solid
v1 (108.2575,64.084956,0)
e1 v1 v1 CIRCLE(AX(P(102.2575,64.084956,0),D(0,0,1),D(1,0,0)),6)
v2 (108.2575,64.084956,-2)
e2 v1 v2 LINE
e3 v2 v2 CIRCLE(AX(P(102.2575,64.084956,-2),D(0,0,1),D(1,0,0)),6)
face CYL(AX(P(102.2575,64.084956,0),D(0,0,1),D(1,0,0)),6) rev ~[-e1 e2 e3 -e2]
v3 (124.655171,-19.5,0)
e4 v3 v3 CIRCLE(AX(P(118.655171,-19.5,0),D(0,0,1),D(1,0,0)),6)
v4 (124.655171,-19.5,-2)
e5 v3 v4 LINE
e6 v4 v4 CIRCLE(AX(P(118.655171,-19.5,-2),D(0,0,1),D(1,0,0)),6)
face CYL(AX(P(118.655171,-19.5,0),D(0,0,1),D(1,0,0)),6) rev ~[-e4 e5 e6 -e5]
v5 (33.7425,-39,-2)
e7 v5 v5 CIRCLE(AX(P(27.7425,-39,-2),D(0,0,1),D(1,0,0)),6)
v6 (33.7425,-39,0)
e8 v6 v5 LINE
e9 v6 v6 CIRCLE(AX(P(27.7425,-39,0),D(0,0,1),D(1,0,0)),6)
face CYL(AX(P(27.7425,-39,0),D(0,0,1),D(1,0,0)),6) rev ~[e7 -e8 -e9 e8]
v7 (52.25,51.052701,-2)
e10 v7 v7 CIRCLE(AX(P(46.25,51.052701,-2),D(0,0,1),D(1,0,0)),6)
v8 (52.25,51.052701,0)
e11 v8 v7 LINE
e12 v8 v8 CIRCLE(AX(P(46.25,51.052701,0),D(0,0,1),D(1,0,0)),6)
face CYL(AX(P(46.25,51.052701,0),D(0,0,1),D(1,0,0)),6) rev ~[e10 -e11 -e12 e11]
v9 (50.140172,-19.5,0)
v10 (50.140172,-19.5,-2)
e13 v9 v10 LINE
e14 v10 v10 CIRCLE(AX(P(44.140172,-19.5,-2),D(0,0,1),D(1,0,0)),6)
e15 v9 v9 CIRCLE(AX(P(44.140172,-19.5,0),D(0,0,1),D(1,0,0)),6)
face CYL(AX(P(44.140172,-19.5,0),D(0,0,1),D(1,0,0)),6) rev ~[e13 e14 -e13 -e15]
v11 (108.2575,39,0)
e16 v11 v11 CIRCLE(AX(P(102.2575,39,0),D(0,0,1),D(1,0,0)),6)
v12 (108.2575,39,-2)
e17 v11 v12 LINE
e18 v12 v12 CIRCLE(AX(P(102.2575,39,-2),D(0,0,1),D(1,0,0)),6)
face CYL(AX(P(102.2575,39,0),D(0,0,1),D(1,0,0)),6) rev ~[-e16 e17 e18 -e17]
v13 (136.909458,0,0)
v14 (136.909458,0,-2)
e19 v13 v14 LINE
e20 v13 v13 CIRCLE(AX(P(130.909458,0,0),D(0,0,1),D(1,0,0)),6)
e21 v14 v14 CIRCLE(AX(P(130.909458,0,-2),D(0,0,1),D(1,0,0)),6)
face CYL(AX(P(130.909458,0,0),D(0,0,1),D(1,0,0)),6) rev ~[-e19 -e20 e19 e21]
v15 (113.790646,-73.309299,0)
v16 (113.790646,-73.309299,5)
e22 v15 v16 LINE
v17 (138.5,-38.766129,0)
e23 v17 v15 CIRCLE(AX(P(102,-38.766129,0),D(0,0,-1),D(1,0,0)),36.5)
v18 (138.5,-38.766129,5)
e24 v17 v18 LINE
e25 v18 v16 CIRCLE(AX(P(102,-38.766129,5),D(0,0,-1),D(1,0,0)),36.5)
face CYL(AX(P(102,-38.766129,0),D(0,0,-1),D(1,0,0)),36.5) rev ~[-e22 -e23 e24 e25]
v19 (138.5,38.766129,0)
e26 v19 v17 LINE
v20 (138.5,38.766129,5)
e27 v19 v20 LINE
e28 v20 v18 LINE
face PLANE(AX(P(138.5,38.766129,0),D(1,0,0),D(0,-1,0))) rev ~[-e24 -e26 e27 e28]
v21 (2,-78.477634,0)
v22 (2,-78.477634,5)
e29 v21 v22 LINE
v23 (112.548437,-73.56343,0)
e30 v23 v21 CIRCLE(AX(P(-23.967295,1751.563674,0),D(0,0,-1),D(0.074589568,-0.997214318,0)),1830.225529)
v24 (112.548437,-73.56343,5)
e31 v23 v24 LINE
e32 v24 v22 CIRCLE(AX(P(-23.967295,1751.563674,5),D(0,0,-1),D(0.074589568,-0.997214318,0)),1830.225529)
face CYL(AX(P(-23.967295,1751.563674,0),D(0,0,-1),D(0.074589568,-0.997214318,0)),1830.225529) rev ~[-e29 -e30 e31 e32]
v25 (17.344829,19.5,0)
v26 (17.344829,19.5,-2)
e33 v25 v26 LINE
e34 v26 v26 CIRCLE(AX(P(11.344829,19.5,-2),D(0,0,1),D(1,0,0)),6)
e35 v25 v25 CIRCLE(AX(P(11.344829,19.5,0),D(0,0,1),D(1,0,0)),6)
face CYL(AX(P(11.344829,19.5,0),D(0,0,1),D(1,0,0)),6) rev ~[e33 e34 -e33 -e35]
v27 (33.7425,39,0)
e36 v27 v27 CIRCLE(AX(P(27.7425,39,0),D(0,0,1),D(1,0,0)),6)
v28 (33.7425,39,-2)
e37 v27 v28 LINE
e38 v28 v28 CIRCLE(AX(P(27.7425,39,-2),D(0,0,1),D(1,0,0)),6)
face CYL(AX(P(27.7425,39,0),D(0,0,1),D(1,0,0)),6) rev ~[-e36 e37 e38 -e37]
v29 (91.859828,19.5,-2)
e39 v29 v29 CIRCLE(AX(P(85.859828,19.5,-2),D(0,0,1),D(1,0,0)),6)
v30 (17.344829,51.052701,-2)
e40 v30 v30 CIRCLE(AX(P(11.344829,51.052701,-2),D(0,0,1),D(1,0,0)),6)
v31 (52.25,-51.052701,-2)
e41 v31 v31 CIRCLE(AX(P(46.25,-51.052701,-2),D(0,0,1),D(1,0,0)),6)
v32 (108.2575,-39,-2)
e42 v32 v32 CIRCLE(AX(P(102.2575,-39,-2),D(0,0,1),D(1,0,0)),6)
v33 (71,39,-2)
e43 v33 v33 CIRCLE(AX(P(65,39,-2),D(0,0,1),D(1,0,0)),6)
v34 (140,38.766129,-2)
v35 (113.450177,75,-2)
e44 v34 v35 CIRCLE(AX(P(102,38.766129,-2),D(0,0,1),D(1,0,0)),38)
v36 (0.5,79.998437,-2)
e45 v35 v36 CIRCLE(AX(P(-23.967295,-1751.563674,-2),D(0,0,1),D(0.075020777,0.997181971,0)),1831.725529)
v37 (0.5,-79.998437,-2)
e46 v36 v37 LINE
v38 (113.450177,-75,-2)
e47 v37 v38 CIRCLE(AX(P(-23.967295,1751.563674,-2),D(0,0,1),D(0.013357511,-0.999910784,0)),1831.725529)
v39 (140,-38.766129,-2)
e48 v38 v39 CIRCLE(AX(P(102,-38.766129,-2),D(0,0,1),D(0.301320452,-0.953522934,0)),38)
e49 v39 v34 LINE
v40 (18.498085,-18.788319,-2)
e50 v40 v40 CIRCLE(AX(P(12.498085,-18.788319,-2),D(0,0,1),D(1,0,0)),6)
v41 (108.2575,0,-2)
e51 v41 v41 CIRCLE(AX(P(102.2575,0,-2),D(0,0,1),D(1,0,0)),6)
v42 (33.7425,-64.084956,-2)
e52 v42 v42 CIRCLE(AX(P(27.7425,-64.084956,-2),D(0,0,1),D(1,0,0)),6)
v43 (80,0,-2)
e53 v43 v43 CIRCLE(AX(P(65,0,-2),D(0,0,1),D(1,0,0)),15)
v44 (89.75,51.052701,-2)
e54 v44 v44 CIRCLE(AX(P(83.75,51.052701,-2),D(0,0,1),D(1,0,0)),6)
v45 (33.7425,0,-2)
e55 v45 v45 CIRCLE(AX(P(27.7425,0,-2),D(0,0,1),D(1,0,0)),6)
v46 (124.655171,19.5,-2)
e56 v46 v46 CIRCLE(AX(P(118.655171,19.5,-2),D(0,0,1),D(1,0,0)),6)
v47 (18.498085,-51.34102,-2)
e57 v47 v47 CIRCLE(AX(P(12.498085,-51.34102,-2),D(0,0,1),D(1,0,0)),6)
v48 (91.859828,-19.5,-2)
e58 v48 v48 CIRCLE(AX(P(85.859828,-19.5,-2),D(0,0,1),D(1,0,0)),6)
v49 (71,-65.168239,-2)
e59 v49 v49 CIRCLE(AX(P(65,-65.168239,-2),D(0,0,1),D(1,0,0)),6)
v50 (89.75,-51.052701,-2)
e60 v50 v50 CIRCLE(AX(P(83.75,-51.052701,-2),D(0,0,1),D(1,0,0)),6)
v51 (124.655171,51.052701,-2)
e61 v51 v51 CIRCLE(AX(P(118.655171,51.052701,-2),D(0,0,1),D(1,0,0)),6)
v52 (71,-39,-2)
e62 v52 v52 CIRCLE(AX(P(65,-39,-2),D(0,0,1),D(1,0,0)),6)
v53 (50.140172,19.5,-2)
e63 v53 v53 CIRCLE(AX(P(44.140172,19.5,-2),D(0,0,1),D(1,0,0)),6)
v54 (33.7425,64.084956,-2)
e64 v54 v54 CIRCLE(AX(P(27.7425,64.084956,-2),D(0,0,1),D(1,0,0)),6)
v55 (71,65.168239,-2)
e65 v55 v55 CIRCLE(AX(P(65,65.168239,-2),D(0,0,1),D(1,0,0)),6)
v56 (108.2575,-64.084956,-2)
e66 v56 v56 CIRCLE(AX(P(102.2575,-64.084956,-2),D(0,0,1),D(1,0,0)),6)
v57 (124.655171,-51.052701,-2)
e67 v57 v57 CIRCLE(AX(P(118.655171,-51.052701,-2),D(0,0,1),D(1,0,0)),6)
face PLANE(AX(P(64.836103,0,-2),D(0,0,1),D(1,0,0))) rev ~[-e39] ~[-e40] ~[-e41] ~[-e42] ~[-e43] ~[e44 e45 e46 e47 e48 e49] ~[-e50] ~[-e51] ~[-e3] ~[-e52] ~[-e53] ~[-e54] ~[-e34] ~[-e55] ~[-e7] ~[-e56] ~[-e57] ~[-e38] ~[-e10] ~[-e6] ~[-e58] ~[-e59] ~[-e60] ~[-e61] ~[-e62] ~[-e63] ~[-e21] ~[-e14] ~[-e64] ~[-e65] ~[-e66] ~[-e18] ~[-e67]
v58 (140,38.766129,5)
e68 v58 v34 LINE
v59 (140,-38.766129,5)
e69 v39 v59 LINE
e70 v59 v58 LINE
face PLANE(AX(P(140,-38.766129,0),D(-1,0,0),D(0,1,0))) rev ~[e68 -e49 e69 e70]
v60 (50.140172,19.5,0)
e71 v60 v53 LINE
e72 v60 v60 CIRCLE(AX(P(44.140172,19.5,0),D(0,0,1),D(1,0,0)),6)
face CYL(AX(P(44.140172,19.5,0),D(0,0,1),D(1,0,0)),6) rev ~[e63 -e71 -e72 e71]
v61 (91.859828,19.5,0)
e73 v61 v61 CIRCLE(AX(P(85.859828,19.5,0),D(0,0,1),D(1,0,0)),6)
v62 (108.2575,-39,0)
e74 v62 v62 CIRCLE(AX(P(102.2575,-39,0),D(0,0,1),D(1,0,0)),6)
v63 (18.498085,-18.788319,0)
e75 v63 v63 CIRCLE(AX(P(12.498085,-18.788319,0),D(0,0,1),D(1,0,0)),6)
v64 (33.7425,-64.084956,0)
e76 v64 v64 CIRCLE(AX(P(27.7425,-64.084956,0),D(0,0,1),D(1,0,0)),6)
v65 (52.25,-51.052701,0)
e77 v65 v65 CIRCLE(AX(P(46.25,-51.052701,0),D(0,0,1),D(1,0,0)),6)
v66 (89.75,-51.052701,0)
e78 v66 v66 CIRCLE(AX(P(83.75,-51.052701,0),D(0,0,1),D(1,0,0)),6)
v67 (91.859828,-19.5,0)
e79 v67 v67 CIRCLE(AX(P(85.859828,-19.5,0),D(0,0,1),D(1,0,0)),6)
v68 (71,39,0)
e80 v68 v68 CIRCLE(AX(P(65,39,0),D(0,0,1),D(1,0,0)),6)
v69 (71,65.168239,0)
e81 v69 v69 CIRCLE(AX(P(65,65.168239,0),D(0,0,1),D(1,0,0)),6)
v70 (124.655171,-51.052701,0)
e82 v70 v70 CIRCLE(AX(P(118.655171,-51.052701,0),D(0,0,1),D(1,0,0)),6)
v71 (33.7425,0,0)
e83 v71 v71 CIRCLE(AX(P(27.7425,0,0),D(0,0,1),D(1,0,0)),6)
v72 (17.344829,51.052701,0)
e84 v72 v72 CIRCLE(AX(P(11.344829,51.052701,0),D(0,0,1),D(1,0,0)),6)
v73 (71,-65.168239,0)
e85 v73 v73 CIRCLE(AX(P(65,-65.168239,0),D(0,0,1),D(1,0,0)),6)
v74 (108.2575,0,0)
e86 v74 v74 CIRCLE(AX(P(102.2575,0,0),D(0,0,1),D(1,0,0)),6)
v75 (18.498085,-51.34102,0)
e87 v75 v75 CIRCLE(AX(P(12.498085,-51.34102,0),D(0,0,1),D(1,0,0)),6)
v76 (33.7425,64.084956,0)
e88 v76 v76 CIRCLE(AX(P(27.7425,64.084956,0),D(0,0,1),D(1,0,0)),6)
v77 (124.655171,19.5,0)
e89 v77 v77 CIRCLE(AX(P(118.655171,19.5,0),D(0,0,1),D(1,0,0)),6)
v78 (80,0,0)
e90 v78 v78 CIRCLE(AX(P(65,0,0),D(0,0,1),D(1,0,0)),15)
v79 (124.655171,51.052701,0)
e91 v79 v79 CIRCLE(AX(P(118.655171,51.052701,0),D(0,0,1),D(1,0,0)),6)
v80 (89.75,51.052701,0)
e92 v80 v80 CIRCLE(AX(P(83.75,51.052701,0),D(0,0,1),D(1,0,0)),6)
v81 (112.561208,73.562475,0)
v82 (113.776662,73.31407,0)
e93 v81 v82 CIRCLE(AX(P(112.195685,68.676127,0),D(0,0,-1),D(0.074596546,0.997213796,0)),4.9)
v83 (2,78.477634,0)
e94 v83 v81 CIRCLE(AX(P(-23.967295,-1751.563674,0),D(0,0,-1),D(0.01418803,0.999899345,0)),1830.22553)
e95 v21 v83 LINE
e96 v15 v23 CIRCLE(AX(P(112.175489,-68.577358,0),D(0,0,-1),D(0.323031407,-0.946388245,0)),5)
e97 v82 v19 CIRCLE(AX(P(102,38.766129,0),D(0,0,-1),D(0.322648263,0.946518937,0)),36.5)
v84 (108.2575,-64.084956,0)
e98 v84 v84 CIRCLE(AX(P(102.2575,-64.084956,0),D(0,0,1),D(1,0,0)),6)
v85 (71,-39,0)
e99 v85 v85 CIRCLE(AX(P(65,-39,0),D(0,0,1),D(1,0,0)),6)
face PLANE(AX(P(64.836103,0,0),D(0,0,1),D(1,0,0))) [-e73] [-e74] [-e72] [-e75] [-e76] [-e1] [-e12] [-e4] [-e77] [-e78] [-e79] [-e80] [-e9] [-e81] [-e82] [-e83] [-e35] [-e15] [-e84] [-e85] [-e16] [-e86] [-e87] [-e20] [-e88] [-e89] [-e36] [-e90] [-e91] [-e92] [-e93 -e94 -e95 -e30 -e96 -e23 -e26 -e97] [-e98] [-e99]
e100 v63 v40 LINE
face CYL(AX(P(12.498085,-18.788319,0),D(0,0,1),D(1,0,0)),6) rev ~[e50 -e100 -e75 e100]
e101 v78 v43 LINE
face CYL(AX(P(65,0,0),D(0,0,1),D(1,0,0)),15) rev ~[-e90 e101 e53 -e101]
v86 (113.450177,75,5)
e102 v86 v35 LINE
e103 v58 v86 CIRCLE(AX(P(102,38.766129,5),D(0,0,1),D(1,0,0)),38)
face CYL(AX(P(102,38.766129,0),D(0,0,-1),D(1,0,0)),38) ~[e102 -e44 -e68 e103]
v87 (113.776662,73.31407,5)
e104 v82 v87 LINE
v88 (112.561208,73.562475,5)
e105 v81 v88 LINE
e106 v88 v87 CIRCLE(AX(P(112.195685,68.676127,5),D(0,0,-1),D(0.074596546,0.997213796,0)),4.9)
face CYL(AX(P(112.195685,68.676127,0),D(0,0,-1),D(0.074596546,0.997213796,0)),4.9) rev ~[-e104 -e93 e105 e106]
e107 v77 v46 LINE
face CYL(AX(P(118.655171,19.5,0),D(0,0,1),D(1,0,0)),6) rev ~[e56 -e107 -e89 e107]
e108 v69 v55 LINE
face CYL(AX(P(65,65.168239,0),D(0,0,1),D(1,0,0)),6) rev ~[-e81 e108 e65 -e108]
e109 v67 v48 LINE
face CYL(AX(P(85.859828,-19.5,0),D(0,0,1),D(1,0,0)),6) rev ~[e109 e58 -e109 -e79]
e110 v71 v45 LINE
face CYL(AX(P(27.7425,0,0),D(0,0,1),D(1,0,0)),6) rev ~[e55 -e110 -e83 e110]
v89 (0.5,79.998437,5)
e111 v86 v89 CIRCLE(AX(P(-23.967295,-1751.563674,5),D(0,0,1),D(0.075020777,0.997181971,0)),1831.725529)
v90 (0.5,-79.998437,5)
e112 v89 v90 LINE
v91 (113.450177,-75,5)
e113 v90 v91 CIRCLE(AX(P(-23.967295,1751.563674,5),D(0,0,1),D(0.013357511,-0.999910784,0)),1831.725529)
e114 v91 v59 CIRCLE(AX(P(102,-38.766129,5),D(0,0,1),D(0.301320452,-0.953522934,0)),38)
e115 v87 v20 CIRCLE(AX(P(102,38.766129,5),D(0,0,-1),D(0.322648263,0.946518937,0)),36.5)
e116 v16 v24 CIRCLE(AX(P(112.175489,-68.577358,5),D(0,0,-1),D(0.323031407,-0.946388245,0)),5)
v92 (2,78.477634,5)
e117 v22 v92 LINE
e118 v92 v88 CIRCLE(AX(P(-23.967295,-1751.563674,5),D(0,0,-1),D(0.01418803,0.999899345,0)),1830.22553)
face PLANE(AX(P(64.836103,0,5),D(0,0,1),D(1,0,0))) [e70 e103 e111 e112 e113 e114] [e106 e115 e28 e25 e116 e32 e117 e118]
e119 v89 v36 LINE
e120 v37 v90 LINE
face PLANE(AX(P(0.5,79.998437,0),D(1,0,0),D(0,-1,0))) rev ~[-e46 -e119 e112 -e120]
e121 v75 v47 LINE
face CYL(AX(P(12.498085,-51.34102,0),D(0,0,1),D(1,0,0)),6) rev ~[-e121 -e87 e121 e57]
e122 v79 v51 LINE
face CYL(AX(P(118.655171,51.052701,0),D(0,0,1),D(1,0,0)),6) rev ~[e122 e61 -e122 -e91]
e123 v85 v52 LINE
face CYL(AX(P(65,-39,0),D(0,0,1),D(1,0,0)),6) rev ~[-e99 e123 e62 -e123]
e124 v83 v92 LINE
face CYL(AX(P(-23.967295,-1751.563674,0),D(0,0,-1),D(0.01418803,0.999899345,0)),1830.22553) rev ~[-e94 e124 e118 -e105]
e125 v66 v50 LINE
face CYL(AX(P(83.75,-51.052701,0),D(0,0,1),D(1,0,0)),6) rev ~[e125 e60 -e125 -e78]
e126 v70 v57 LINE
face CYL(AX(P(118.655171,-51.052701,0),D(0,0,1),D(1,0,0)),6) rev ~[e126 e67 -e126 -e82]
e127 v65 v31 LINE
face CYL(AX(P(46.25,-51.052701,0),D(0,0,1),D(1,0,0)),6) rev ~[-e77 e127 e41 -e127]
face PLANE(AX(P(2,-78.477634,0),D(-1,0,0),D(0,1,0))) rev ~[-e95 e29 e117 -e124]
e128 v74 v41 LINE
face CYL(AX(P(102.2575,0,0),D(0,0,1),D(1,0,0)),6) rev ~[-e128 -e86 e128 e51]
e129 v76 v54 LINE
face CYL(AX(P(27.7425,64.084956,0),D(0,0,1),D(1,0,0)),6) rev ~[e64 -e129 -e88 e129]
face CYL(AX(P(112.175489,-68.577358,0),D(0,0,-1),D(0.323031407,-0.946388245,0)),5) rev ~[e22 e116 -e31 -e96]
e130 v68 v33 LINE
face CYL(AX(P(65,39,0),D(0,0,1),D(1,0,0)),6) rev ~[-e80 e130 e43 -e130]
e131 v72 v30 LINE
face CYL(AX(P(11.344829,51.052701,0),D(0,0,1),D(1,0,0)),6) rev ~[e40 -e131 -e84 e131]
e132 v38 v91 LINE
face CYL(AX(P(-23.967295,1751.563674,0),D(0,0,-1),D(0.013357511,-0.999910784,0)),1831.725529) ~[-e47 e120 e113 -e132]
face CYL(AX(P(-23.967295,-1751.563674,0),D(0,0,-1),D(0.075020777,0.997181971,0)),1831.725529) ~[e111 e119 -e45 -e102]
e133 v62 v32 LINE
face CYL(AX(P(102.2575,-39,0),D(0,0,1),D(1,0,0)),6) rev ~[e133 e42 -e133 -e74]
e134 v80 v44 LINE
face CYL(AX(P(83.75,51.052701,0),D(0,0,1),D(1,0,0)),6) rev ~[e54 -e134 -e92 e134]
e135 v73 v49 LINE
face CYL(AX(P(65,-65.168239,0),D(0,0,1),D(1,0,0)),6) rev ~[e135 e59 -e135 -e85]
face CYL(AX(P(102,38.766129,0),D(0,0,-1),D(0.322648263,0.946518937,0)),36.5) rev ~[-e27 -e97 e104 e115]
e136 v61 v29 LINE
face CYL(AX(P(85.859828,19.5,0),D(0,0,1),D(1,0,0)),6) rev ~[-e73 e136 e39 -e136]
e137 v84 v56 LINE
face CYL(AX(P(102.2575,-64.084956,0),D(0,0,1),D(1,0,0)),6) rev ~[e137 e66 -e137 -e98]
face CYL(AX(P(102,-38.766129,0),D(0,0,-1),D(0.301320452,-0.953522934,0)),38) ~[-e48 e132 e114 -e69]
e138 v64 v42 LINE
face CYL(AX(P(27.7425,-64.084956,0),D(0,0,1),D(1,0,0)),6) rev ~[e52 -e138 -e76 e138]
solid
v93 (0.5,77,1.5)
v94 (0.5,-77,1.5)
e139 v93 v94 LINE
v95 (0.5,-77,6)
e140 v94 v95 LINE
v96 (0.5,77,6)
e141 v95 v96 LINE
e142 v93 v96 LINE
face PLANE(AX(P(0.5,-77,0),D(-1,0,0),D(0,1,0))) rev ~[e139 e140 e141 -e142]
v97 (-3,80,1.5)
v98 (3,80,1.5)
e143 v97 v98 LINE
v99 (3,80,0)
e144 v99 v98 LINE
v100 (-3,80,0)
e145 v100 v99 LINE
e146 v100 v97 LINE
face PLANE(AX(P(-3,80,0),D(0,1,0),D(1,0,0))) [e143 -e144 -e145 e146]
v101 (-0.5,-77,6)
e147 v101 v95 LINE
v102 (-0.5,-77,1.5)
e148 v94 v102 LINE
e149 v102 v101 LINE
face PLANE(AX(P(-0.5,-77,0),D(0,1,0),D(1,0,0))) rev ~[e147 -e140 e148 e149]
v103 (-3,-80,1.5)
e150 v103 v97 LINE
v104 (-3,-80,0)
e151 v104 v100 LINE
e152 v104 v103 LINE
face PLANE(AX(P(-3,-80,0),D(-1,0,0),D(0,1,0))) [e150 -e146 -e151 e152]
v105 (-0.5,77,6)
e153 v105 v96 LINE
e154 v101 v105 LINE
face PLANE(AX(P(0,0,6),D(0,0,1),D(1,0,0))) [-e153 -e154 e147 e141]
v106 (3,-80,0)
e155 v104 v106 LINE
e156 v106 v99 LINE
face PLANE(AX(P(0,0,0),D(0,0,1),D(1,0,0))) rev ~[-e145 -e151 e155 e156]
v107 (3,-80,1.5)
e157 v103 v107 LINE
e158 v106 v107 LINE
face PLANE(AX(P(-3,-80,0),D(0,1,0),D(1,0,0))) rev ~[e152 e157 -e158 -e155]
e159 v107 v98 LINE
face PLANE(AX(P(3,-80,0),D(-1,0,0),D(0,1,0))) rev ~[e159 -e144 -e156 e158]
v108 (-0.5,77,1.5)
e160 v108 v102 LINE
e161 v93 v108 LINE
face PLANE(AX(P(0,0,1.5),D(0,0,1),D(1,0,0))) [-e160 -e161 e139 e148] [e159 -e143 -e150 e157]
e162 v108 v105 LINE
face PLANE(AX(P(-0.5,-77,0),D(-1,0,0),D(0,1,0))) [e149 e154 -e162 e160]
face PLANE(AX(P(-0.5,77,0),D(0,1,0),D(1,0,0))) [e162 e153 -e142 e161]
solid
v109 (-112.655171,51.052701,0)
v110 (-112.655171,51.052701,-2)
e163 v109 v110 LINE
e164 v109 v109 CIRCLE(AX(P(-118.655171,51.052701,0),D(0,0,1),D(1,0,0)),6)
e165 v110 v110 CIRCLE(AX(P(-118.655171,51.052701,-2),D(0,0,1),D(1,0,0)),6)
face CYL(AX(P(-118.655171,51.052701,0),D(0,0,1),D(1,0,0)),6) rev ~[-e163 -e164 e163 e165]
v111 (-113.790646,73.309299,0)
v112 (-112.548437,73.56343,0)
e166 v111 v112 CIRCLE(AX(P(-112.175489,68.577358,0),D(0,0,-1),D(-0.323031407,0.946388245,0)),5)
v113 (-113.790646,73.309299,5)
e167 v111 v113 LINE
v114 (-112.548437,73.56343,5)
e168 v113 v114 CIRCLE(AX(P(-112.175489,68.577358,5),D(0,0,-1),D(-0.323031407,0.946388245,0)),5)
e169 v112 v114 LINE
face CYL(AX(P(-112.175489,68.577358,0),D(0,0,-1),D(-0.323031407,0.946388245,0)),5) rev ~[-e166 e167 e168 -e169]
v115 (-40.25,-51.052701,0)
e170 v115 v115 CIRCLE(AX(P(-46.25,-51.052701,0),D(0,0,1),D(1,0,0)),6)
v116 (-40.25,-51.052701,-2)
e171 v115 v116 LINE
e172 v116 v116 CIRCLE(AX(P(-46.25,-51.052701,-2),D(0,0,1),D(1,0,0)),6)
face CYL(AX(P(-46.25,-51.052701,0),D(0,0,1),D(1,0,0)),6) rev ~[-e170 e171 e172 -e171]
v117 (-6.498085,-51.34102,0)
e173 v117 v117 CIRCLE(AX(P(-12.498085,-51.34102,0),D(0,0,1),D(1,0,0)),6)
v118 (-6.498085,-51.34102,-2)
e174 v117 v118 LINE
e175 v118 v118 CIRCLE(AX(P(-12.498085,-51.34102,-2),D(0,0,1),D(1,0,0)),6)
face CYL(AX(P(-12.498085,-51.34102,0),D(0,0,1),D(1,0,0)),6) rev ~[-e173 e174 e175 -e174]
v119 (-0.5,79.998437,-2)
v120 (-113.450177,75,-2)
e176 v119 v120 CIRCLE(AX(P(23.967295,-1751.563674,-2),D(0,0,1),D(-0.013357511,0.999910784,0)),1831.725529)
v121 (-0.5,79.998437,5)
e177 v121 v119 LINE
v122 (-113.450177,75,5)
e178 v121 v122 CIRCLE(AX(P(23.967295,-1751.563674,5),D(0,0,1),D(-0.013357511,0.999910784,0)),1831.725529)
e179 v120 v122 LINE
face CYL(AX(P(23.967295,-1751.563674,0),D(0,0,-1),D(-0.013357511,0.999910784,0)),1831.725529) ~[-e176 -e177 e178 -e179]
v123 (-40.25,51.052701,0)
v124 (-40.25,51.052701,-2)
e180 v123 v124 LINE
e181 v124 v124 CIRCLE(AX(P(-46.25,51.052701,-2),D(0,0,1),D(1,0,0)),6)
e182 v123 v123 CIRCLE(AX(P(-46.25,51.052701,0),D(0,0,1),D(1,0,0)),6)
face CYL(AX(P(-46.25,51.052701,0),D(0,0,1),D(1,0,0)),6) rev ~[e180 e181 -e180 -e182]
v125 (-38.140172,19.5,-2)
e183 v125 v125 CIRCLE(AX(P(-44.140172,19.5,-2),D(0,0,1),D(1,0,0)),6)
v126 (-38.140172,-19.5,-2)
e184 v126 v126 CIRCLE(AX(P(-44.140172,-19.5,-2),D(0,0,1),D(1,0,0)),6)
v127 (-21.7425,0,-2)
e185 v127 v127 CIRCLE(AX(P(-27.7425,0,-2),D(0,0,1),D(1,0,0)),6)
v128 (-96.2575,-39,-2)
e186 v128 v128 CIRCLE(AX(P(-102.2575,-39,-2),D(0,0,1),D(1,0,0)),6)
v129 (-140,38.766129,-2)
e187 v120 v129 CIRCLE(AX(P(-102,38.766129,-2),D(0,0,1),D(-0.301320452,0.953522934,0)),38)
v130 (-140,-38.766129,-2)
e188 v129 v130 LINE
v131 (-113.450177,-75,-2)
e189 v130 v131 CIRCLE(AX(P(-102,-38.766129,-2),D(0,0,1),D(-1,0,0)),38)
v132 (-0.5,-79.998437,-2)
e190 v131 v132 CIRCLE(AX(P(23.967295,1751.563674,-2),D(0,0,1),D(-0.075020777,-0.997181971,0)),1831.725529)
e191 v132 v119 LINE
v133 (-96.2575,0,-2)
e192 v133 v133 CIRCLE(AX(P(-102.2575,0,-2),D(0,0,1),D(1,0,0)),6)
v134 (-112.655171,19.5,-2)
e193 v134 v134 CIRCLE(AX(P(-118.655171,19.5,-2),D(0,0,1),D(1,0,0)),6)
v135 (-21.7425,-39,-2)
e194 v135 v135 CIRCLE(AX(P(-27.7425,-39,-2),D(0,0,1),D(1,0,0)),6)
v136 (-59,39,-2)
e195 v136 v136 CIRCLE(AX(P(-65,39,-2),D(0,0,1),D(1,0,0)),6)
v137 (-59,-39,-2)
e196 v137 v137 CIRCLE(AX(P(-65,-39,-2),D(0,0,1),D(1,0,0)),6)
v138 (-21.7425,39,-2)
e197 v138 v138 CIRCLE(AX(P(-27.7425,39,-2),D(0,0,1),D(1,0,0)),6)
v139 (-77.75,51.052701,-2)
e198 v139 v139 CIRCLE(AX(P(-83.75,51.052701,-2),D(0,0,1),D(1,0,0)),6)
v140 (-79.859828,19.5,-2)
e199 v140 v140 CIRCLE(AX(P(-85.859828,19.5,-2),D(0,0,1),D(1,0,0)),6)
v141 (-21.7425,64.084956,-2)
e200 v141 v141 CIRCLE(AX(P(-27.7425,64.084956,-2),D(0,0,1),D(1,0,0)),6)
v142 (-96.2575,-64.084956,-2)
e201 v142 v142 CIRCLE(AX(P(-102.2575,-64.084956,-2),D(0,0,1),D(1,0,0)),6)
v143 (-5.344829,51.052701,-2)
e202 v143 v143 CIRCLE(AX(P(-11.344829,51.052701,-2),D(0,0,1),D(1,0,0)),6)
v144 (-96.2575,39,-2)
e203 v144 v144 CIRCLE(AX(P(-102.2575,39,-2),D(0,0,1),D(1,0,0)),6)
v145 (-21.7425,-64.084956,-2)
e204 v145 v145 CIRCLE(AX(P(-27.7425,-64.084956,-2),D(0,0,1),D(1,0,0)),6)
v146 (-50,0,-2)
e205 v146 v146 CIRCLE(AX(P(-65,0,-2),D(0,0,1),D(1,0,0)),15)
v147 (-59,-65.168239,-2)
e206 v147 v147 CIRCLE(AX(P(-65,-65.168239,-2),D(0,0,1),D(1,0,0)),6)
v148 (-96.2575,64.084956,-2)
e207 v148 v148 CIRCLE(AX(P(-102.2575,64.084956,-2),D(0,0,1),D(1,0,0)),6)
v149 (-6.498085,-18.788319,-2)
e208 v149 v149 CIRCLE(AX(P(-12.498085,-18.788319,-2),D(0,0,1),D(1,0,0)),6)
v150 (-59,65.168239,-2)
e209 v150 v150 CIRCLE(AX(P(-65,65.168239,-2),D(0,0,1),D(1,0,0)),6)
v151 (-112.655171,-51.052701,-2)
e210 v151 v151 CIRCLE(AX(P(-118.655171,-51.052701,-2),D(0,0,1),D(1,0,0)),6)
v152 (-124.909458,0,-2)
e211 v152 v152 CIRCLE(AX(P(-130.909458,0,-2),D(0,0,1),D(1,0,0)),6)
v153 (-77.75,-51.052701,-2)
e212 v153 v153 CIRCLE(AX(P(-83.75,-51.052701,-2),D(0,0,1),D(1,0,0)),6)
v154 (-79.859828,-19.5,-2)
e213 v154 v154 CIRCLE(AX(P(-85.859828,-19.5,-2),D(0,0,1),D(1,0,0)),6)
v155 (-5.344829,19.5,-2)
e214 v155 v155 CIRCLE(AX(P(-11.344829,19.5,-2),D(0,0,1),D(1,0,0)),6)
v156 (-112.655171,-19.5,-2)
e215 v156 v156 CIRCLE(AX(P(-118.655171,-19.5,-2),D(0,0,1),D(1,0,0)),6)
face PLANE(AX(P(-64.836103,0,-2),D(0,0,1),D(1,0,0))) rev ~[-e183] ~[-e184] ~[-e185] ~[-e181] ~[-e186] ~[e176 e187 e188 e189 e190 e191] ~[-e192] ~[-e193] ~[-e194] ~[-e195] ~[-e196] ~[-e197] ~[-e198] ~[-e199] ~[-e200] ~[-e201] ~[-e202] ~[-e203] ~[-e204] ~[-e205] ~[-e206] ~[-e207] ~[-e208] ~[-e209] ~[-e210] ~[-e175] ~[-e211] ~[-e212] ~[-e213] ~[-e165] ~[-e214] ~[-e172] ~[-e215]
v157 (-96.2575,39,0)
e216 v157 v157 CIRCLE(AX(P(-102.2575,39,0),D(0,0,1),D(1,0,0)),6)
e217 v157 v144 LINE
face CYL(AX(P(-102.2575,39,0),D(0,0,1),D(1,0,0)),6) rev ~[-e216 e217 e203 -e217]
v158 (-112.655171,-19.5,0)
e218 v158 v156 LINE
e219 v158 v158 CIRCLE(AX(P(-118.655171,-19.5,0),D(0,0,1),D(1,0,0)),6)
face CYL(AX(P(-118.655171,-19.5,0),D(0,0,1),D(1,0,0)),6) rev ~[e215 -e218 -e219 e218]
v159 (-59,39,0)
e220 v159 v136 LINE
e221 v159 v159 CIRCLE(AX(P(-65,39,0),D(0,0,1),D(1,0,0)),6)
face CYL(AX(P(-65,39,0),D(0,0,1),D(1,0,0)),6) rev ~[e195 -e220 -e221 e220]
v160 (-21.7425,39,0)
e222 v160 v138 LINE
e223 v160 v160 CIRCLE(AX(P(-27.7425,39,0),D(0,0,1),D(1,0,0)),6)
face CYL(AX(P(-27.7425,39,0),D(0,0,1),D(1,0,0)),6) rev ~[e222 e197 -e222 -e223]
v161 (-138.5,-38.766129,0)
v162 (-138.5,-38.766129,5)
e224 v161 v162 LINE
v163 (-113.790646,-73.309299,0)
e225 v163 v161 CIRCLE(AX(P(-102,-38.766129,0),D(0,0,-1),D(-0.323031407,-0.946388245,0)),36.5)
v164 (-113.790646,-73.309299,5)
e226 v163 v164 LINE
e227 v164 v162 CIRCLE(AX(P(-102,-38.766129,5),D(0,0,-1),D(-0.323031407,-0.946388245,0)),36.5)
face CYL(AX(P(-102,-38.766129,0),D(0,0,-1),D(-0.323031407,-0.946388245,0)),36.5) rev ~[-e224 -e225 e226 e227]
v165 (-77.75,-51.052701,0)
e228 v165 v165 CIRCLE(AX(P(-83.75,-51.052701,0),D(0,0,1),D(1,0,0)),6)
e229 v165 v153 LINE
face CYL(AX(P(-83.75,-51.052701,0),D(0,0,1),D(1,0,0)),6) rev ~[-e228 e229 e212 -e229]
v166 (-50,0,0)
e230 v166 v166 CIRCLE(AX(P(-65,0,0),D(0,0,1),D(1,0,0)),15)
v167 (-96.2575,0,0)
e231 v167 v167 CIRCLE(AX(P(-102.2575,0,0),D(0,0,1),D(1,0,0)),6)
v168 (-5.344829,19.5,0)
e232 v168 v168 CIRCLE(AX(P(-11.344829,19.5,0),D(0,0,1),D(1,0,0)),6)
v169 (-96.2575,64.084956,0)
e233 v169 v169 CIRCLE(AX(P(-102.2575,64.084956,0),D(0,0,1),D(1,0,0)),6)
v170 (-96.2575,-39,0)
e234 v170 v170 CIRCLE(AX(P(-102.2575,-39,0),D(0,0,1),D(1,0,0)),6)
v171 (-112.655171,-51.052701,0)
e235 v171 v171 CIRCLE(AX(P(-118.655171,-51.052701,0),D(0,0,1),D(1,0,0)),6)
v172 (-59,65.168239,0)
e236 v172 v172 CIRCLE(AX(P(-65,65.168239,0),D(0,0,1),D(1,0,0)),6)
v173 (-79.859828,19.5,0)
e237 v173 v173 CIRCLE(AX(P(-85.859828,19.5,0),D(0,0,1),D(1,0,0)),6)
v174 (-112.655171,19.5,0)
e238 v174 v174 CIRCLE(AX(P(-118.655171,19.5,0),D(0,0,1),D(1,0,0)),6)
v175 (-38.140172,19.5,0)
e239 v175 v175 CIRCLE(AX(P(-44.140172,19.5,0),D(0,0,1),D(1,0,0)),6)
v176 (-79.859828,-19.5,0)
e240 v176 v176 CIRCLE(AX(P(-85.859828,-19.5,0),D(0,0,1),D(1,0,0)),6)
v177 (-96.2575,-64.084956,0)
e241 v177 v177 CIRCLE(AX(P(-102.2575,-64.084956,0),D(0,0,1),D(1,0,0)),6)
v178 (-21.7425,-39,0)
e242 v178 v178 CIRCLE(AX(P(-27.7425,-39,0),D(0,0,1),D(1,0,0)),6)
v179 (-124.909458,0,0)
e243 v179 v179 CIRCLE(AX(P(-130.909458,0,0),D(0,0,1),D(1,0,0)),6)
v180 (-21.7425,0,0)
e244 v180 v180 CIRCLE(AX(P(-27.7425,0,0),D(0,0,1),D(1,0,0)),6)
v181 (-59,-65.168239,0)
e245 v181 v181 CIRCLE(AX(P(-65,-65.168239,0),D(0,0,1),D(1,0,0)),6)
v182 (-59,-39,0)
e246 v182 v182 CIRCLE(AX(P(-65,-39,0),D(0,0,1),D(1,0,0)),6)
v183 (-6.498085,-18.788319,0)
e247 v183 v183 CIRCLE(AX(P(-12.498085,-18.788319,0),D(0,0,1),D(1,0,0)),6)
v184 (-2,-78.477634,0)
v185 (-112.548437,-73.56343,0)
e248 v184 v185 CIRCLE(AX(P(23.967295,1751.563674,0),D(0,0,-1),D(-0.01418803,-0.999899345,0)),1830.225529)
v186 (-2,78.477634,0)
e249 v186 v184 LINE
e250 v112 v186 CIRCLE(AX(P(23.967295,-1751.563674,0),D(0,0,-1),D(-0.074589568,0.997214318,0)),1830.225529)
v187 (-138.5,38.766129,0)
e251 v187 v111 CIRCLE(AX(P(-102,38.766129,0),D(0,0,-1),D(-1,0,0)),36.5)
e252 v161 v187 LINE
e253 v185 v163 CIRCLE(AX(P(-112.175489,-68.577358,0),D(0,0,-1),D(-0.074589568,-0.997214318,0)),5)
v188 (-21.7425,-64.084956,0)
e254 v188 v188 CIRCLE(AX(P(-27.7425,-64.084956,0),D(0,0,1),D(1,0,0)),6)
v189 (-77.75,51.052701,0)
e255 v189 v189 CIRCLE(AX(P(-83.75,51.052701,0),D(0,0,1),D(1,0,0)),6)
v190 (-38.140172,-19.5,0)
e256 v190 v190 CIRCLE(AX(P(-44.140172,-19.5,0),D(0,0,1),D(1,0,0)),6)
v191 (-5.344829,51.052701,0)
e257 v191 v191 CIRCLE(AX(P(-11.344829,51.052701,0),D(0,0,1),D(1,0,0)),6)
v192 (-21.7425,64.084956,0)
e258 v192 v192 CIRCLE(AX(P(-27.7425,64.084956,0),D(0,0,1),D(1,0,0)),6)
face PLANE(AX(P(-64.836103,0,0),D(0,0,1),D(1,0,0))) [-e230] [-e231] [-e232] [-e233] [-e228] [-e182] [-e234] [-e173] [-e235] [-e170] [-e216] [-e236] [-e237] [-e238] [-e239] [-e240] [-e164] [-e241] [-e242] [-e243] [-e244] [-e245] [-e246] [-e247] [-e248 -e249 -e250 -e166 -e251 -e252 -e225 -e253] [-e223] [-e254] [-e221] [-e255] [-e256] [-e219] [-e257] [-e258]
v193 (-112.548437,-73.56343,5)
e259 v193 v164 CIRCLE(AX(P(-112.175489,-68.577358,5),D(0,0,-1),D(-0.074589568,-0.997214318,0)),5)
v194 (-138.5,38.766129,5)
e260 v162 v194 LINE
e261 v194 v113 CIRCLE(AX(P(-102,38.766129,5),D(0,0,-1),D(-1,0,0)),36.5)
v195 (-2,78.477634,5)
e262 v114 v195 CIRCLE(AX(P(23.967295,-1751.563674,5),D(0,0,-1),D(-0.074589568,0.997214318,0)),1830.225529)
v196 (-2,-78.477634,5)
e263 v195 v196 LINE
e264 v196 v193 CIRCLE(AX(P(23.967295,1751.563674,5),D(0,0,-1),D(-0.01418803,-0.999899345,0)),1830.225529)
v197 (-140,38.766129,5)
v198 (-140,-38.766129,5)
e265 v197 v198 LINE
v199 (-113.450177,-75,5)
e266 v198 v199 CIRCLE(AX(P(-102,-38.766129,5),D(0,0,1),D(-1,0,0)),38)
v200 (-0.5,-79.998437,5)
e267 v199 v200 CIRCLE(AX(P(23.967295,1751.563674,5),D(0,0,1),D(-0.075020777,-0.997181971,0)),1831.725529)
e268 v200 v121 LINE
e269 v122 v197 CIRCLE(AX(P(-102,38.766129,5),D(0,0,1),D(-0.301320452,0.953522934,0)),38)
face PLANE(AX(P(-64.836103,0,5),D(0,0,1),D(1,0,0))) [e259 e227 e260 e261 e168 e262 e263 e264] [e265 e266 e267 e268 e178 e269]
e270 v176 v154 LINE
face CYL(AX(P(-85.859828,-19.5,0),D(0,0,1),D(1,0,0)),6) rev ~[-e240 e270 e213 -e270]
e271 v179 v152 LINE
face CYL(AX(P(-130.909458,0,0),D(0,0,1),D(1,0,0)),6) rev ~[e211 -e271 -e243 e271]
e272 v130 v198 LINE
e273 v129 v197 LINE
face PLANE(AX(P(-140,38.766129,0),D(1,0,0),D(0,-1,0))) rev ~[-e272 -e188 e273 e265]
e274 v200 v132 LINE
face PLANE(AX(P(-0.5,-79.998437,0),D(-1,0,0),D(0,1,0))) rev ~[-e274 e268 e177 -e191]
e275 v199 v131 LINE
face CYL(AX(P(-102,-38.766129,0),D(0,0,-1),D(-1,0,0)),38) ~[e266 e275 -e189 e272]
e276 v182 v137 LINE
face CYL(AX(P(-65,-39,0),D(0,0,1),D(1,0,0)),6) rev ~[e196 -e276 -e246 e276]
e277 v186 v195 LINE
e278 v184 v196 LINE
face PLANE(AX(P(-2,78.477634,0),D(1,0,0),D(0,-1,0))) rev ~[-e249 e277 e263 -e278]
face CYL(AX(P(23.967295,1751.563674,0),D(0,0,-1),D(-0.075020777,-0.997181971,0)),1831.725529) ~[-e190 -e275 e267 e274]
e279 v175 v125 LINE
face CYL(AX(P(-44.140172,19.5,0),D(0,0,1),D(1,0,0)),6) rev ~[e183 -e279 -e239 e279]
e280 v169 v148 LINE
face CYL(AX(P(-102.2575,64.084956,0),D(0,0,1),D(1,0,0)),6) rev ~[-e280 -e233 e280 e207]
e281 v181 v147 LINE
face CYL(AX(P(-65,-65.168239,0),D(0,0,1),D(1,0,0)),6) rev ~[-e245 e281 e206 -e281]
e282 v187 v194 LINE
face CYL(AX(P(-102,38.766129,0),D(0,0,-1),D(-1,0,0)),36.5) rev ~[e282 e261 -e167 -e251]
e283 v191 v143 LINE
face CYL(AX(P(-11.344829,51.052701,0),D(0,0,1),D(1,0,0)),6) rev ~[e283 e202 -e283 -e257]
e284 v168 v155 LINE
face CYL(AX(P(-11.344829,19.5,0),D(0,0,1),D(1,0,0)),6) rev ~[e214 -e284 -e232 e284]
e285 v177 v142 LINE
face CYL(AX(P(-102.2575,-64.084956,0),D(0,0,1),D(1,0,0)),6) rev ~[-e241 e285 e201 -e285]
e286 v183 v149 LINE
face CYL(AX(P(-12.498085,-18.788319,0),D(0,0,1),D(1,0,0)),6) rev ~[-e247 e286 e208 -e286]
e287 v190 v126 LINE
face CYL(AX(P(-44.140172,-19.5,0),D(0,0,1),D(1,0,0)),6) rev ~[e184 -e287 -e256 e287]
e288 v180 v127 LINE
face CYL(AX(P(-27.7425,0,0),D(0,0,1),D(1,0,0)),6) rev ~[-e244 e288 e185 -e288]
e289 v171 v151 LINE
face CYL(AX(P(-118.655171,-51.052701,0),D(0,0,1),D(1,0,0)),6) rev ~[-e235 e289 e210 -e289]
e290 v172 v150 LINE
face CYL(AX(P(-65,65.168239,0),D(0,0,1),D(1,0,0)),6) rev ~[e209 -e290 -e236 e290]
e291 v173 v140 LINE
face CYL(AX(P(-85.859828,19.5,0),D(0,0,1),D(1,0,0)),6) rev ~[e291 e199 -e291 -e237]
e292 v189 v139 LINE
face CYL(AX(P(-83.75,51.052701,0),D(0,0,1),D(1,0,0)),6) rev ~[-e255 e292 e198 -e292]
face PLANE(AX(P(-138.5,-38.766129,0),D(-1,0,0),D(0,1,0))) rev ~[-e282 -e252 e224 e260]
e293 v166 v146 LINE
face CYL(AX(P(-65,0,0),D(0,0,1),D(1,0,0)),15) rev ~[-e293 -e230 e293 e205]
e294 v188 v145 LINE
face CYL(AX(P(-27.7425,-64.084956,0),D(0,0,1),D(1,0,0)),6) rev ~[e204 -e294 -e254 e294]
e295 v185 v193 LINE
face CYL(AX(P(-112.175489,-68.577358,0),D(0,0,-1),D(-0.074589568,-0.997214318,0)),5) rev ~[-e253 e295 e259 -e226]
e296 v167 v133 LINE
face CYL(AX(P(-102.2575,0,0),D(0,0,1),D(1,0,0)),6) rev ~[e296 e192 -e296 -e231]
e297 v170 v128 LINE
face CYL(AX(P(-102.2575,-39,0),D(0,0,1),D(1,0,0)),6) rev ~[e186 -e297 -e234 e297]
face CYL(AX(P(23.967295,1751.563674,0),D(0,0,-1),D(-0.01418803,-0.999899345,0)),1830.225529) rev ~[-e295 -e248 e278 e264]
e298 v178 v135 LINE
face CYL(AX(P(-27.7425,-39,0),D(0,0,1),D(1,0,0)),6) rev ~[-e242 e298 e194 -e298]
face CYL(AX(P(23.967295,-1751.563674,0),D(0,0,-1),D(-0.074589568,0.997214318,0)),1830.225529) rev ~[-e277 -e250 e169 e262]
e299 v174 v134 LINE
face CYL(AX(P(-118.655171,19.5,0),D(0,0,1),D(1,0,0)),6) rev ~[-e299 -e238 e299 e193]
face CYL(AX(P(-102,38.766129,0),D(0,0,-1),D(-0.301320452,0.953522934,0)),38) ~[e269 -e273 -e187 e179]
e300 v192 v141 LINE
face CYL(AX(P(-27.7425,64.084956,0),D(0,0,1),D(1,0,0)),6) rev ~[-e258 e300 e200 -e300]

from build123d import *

# Parameters (mm, degrees)
F0_R     = 6
F0_R_2   = 15
F1_DEPTH = 2
F2_DEPTH = 5
F3_W     = 6
F3_H     = 160
F3_W_2   = 1
F3_H_2   = 154
F4_DEPTH = 1.5
F5_DEPTH = 6


with BuildPart() as f1:
    # F0 (on Top) → F1 (new body)
    with BuildSketch(Plane.XY):
        with BuildLine():
            Line((-0.5, 0), (-0.5, 79.9984374847))
            ThreePointArc((-0.5, 79.9984374847), (-57.0136629792, 78.37088801), (-113.4501771756, 75))
            ThreePointArc((-113.4501771756, 75), (-132.6521347762, 61.2260179571), (-140, 38.766128517))
            Line((-140, 38.766128517), (-140, 0))
            Line((-140, 0), (-140, -38.766128517))
            ThreePointArc((-140, -38.766128517), (-132.6521347762, -61.2260179571), (-113.4501771756, -75))
            ThreePointArc((-113.4501771756, -75), (-57.0136629792, -78.37088801), (-0.5, -79.9984374847))
            Line((-0.5, -79.9984374847), (-0.5, 0))
        make_face()
        with BuildLine():
            Line((-138.5, 0), (-138.5, 38.766128517))
            ThreePointArc((-138.5, 38.766128517), (-131.6867697088, 60.0016107168), (-113.790646342, 73.3092994606))
            ThreePointArc((-113.790646342, 73.3092994606), (-113.1776299217, 73.475900283), (-112.5484371493, 73.5634298262))
            ThreePointArc((-112.5484371493, 73.5634298262), (-57.311366893, 76.8562092122), (-2, 78.4776342095))
            Line((-2, 78.4776342095), (-2, 78.441327033))
            Line((-2, 78.441327033), (-2, 0.2514436209))
            Line((-2, 0.2514436209), (-2, -78.4413795778))
            Line((-2, -78.4413795778), (-2, -78.4776342095))
            ThreePointArc((-2, -78.4776342095), (-57.311366893, -76.8562092122), (-112.5484371493, -73.5634298262))
            ThreePointArc((-112.5484371493, -73.5634298262), (-113.1776299217, -73.475900283), (-113.790646342, -73.3092994606))
            ThreePointArc((-113.790646342, -73.3092994606), (-131.6867697088, -60.0016107168), (-138.5, -38.766128517))
            Line((-138.5, -38.766128517), (-138.5, 0))
        make_face(mode=Mode.SUBTRACT)
        with BuildLine():
            ThreePointArc((-113.790646342, 73.3092994606), (-131.6867697088, 60.0016107168), (-138.5, 38.766128517))
            Line((-138.5, 38.766128517), (-138.5, 0))
            Line((-138.5, 0), (-138.5, -38.766128517))
            ThreePointArc((-138.5, -38.766128517), (-131.6867697088, -60.0016107168), (-113.790646342, -73.3092994606))
            ThreePointArc((-113.790646342, -73.3092994606), (-113.1776299217, -73.475900283), (-112.5484371493, -73.5634298262))
            ThreePointArc((-112.5484371493, -73.5634298262), (-57.311366893, -76.8562092122), (-2, -78.4776342095))
            Line((-2, -78.4776342095), (-2, -78.4413795778))
            Line((-2, -78.4413795778), (-2, 0.2514436209))
            Line((-2, 0.2514436209), (-2, 78.441327033))
            Line((-2, 78.441327033), (-2, 78.4776342095))
            ThreePointArc((-2, 78.4776342095), (-57.311366893, 76.8562092122), (-112.5484371493, 73.5634298262))
            ThreePointArc((-112.5484371493, 73.5634298262), (-113.1776299217, 73.475900283), (-113.790646342, 73.3092994606))
        make_face()
        with Locations((-102.2574998881, -64.0849556577)):
            Circle(F0_R, mode=Mode.SUBTRACT)
        with Locations((-118.6551713943, -51.0527007282)):
            Circle(F0_R, mode=Mode.SUBTRACT)
        with Locations((-83.75, -51.0527007282)):
            Circle(F0_R, mode=Mode.SUBTRACT)
        with Locations((-65, -65.1682391763)):
            Circle(F0_R, mode=Mode.SUBTRACT)
        with Locations((-27.7425001119, -64.0849556577)):
            Circle(F0_R, mode=Mode.SUBTRACT)
        with Locations((-46.25, -51.0527007282)):
            Circle(F0_R, mode=Mode.SUBTRACT)
        with Locations((-12.4980853498, -51.3410195708)):
            Circle(F0_R, mode=Mode.SUBTRACT)
        with Locations((-102.2574998881, -39)):
            Circle(F0_R, mode=Mode.SUBTRACT)
        with Locations((-118.6551713943, -19.5)):
            Circle(F0_R, mode=Mode.SUBTRACT)
        with Locations((-85.8598283819, -19.5)):
            Circle(F0_R, mode=Mode.SUBTRACT)
        with Locations((-65, -39)):
            Circle(F0_R, mode=Mode.SUBTRACT)
        with Locations((-27.7425001119, -39)):
            Circle(F0_R, mode=Mode.SUBTRACT)
        with Locations((-44.1401716181, -19.5)):
            Circle(F0_R, mode=Mode.SUBTRACT)
        with Locations((-12.4980853498, -18.7883188426)):
            Circle(F0_R, mode=Mode.SUBTRACT)
        with Locations((-130.9094578028, 0)):
            Circle(F0_R, mode=Mode.SUBTRACT)
        with Locations((-118.6551713943, 19.5)):
            Circle(F0_R, mode=Mode.SUBTRACT)
        with Locations((-102.2574998881, 0)):
            Circle(F0_R, mode=Mode.SUBTRACT)
        with Locations((-85.8598283819, 19.5)):
            Circle(F0_R, mode=Mode.SUBTRACT)
        with Locations((-102.2574998881, 39)):
            Circle(F0_R, mode=Mode.SUBTRACT)
        with Locations((-65, 0)):
            Circle(F0_R_2, mode=Mode.SUBTRACT)
        with Locations((-44.1401716181, 19.5)):
            Circle(F0_R, mode=Mode.SUBTRACT)
        with Locations((-27.7425001119, 0)):
            Circle(F0_R, mode=Mode.SUBTRACT)
        with Locations((-11.3448286057, 19.5)):
            Circle(F0_R, mode=Mode.SUBTRACT)
        with Locations((-65, 39)):
            Circle(F0_R, mode=Mode.SUBTRACT)
        with Locations((-27.7425001119, 39)):
            Circle(F0_R, mode=Mode.SUBTRACT)
        with Locations((-118.6551713943, 51.0527007282)):
            Circle(F0_R, mode=Mode.SUBTRACT)
        with Locations((-83.75, 51.0527007282)):
            Circle(F0_R, mode=Mode.SUBTRACT)
        with Locations((-102.2574998881, 64.0849556577)):
            Circle(F0_R, mode=Mode.SUBTRACT)
        with Locations((-46.25, 51.0527007282)):
            Circle(F0_R, mode=Mode.SUBTRACT)
        with Locations((-11.3448286057, 51.0527007282)):
            Circle(F0_R, mode=Mode.SUBTRACT)
        with Locations((-65, 65.1682391763)):
            Circle(F0_R, mode=Mode.SUBTRACT)
        with Locations((-27.7425001119, 64.0849556577)):
            Circle(F0_R, mode=Mode.SUBTRACT)
    extrude(amount=-F1_DEPTH)

    # F0 (on Top) → F2, piece 2 (join)
    with BuildSketch(Plane.XY):
        with BuildLine():
            Line((-0.5, 0), (-0.5, 79.9984374847))
            ThreePointArc((-0.5, 79.9984374847), (-57.0136629792, 78.37088801), (-113.4501771756, 75))
            ThreePointArc((-113.4501771756, 75), (-132.6521347762, 61.2260179571), (-140, 38.766128517))
            Line((-140, 38.766128517), (-140, 0))
            Line((-140, 0), (-140, -38.766128517))
            ThreePointArc((-140, -38.766128517), (-132.6521347762, -61.2260179571), (-113.4501771756, -75))
            ThreePointArc((-113.4501771756, -75), (-57.0136629792, -78.37088801), (-0.5, -79.9984374847))
            Line((-0.5, -79.9984374847), (-0.5, 0))
        make_face()
        with BuildLine():
            Line((-138.5, 0), (-138.5, 38.766128517))
            ThreePointArc((-138.5, 38.766128517), (-131.6867697088, 60.0016107168), (-113.790646342, 73.3092994606))
            ThreePointArc((-113.790646342, 73.3092994606), (-113.1776299217, 73.475900283), (-112.5484371493, 73.5634298262))
            ThreePointArc((-112.5484371493, 73.5634298262), (-57.311366893, 76.8562092122), (-2, 78.4776342095))
            Line((-2, 78.4776342095), (-2, 78.441327033))
            Line((-2, 78.441327033), (-2, 0.2514436209))
            Line((-2, 0.2514436209), (-2, -78.4413795778))
            Line((-2, -78.4413795778), (-2, -78.4776342095))
            ThreePointArc((-2, -78.4776342095), (-57.311366893, -76.8562092122), (-112.5484371493, -73.5634298262))
            ThreePointArc((-112.5484371493, -73.5634298262), (-113.1776299217, -73.475900283), (-113.790646342, -73.3092994606))
            ThreePointArc((-113.790646342, -73.3092994606), (-131.6867697088, -60.0016107168), (-138.5, -38.766128517))
            Line((-138.5, -38.766128517), (-138.5, 0))
        make_face(mode=Mode.SUBTRACT)
    extrude(amount=F2_DEPTH)


with BuildPart() as f1b:
    # F0 (on Top) → F1, piece 2 (new body)
    with BuildSketch(Plane.XY):
        with BuildLine():
            Line((0.5, 79.9984374847), (0.5, 79.9917448723))
            Line((0.5, 79.9917448723), (0.5, 78.4983035398))
            Line((0.5, 78.4983035398), (0.5, 0))
            Line((0.5, 0), (0.5, -79.9984374847))
            ThreePointArc((0.5, -79.9984374847), (57.0136629792, -78.37088801), (113.4501771756, -75))
            ThreePointArc((113.4501771756, -75), (132.6521347762, -61.2260179571), (140, -38.766128517))
            Line((140, -38.766128517), (140, 0))
            Line((140, 0), (140, 38.766128517))
            ThreePointArc((140, 38.766128517), (132.6521347762, 61.2260179571), (113.4501771756, 75))
            ThreePointArc((113.4501771756, 75), (57.0136629792, 78.37088801), (0.5, 79.9984374847))
        make_face()
        with BuildLine():
            ThreePointArc((113.7766615915, 73.3140697257), (131.6824708211, 60.0076191887), (138.5, 38.766128517))
            Line((138.5, 38.766128517), (138.5, 0))
            Line((138.5, 0), (138.5, -38.766128517))
            ThreePointArc((138.5, -38.766128517), (131.6867697088, -60.0016107168), (113.790646342, -73.3092994606))
            ThreePointArc((113.790646342, -73.3092994606), (113.1776299217, -73.475900283), (112.5484371493, -73.5634298262))
            ThreePointArc((112.5484371493, -73.5634298262), (57.311366893, -76.8562092122), (2, -78.4776342095))
            Line((2, -78.4776342095), (2, -78.4413270176))
            Line((2, -78.4413270176), (2, 0.251443522))
            Line((2, 0.251443522), (2, 78.4776342095))
            ThreePointArc((2, 78.4776342095), (57.3177639293, 76.8559248338), (112.561208179, 73.5624745347))
            ThreePointArc((112.561208179, 73.5624745347), (113.1768279957, 73.4768933956), (113.7766615915, 73.3140697257))
        make_face(mode=Mode.SUBTRACT)
        with BuildLine():
            Line((138.5, 0), (138.5, 38.766128517))
            ThreePointArc((138.5, 38.766128517), (131.6824708211, 60.0076191887), (113.7766615915, 73.3140697257))
            ThreePointArc((113.7766615915, 73.3140697257), (113.1768279957, 73.4768933956), (112.561208179, 73.5624745347))
            ThreePointArc((112.561208179, 73.5624745347), (57.3177639293, 76.8559248338), (2, 78.4776342095))
            Line((2, 78.4776342095), (2, 0.251443522))
            Line((2, 0.251443522), (2, -78.4413270176))
            Line((2, -78.4413270176), (2, -78.4776342095))
            ThreePointArc((2, -78.4776342095), (57.311366893, -76.8562092122), (112.5484371493, -73.5634298262))
            ThreePointArc((112.5484371493, -73.5634298262), (113.1776299217, -73.475900283), (113.790646342, -73.3092994606))
            ThreePointArc((113.790646342, -73.3092994606), (131.6867697088, -60.0016107168), (138.5, -38.766128517))
            Line((138.5, -38.766128517), (138.5, 0))
        make_face()
        with Locations((27.7425001119, -64.0849556577)):
            Circle(F0_R, mode=Mode.SUBTRACT)
        with Locations((65, -65.1682391763)):
            Circle(F0_R, mode=Mode.SUBTRACT)
        with Locations((12.4980853498, -51.3410195708)):
            Circle(F0_R, mode=Mode.SUBTRACT)
        with Locations((46.25, -51.0527007282)):
            Circle(F0_R, mode=Mode.SUBTRACT)
        with Locations((102.2574998881, -64.0849556577)):
            Circle(F0_R, mode=Mode.SUBTRACT)
        with Locations((83.75, -51.0527007282)):
            Circle(F0_R, mode=Mode.SUBTRACT)
        with Locations((118.6551713943, -51.0527007282)):
            Circle(F0_R, mode=Mode.SUBTRACT)
        with Locations((27.7425001119, -39)):
            Circle(F0_R, mode=Mode.SUBTRACT)
        with Locations((65, -39)):
            Circle(F0_R, mode=Mode.SUBTRACT)
        with Locations((12.4980853498, -18.7883188426)):
            Circle(F0_R, mode=Mode.SUBTRACT)
        with Locations((44.1401716181, -19.5)):
            Circle(F0_R, mode=Mode.SUBTRACT)
        with Locations((102.2574998881, -39)):
            Circle(F0_R, mode=Mode.SUBTRACT)
        with Locations((85.8598283819, -19.5)):
            Circle(F0_R, mode=Mode.SUBTRACT)
        with Locations((118.6551713943, -19.5)):
            Circle(F0_R, mode=Mode.SUBTRACT)
        with Locations((27.7425001119, 0)):
            Circle(F0_R, mode=Mode.SUBTRACT)
        with Locations((11.3448286057, 19.5)):
            Circle(F0_R, mode=Mode.SUBTRACT)
        with Locations((65, 0)):
            Circle(F0_R_2, mode=Mode.SUBTRACT)
        with Locations((44.1401716181, 19.5)):
            Circle(F0_R, mode=Mode.SUBTRACT)
        with Locations((27.7425001119, 39)):
            Circle(F0_R, mode=Mode.SUBTRACT)
        with Locations((65, 39)):
            Circle(F0_R, mode=Mode.SUBTRACT)
        with Locations((102.2574998881, 0)):
            Circle(F0_R, mode=Mode.SUBTRACT)
        with Locations((85.8598283819, 19.5)):
            Circle(F0_R, mode=Mode.SUBTRACT)
        with Locations((130.9094578028, 0)):
            Circle(F0_R, mode=Mode.SUBTRACT)
        with Locations((118.6551713943, 19.5)):
            Circle(F0_R, mode=Mode.SUBTRACT)
        with Locations((102.2574998881, 39)):
            Circle(F0_R, mode=Mode.SUBTRACT)
        with Locations((11.3448286057, 51.0527007282)):
            Circle(F0_R, mode=Mode.SUBTRACT)
        with Locations((46.25, 51.0527007282)):
            Circle(F0_R, mode=Mode.SUBTRACT)
        with Locations((27.7425001119, 64.0849556577)):
            Circle(F0_R, mode=Mode.SUBTRACT)
        with Locations((65, 65.1682391763)):
            Circle(F0_R, mode=Mode.SUBTRACT)
        with Locations((83.75, 51.0527007282)):
            Circle(F0_R, mode=Mode.SUBTRACT)
        with Locations((118.6551713943, 51.0527007282)):
            Circle(F0_R, mode=Mode.SUBTRACT)
        with Locations((102.2574998881, 64.0849556577)):
            Circle(F0_R, mode=Mode.SUBTRACT)
    extrude(amount=-F1_DEPTH)

    # F0 (on Top) → F2 (join)
    with BuildSketch(Plane.XY):
        with BuildLine():
            Line((0.5, 79.9984374847), (0.5, 79.9917448723))
            Line((0.5, 79.9917448723), (0.5, 78.4983035398))
            Line((0.5, 78.4983035398), (0.5, 0))
            Line((0.5, 0), (0.5, -79.9984374847))
            ThreePointArc((0.5, -79.9984374847), (57.0136629792, -78.37088801), (113.4501771756, -75))
            ThreePointArc((113.4501771756, -75), (132.6521347762, -61.2260179571), (140, -38.766128517))
            Line((140, -38.766128517), (140, 0))
            Line((140, 0), (140, 38.766128517))
            ThreePointArc((140, 38.766128517), (132.6521347762, 61.2260179571), (113.4501771756, 75))
            ThreePointArc((113.4501771756, 75), (57.0136629792, 78.37088801), (0.5, 79.9984374847))
        make_face()
        with BuildLine():
            ThreePointArc((113.7766615915, 73.3140697257), (131.6824708211, 60.0076191887), (138.5, 38.766128517))
            Line((138.5, 38.766128517), (138.5, 0))
            Line((138.5, 0), (138.5, -38.766128517))
            ThreePointArc((138.5, -38.766128517), (131.6867697088, -60.0016107168), (113.790646342, -73.3092994606))
            ThreePointArc((113.790646342, -73.3092994606), (113.1776299217, -73.475900283), (112.5484371493, -73.5634298262))
            ThreePointArc((112.5484371493, -73.5634298262), (57.311366893, -76.8562092122), (2, -78.4776342095))
            Line((2, -78.4776342095), (2, -78.4413270176))
            Line((2, -78.4413270176), (2, 0.251443522))
            Line((2, 0.251443522), (2, 78.4776342095))
            ThreePointArc((2, 78.4776342095), (57.3177639293, 76.8559248338), (112.561208179, 73.5624745347))
            ThreePointArc((112.561208179, 73.5624745347), (113.1768279957, 73.4768933956), (113.7766615915, 73.3140697257))
        make_face(mode=Mode.SUBTRACT)
    extrude(amount=F2_DEPTH)


with BuildPart() as f4:
    # F3 (on Top) → F4 (new body)
    with BuildSketch(Plane.XY):
        Rectangle(F3_W, F3_H)
        Rectangle(F3_W_2, F3_H_2, mode=Mode.SUBTRACT)
        Rectangle(F3_W_2, F3_H_2)
    extrude(amount=F4_DEPTH)

    # F3 (on Top) → F5 (join)
    with BuildSketch(Plane.XY):
        Rectangle(F3_W_2, F3_H_2)
    extrude(amount=F5_DEPTH)


solid = Compound([f1.part, f1b.part, f4.part])
